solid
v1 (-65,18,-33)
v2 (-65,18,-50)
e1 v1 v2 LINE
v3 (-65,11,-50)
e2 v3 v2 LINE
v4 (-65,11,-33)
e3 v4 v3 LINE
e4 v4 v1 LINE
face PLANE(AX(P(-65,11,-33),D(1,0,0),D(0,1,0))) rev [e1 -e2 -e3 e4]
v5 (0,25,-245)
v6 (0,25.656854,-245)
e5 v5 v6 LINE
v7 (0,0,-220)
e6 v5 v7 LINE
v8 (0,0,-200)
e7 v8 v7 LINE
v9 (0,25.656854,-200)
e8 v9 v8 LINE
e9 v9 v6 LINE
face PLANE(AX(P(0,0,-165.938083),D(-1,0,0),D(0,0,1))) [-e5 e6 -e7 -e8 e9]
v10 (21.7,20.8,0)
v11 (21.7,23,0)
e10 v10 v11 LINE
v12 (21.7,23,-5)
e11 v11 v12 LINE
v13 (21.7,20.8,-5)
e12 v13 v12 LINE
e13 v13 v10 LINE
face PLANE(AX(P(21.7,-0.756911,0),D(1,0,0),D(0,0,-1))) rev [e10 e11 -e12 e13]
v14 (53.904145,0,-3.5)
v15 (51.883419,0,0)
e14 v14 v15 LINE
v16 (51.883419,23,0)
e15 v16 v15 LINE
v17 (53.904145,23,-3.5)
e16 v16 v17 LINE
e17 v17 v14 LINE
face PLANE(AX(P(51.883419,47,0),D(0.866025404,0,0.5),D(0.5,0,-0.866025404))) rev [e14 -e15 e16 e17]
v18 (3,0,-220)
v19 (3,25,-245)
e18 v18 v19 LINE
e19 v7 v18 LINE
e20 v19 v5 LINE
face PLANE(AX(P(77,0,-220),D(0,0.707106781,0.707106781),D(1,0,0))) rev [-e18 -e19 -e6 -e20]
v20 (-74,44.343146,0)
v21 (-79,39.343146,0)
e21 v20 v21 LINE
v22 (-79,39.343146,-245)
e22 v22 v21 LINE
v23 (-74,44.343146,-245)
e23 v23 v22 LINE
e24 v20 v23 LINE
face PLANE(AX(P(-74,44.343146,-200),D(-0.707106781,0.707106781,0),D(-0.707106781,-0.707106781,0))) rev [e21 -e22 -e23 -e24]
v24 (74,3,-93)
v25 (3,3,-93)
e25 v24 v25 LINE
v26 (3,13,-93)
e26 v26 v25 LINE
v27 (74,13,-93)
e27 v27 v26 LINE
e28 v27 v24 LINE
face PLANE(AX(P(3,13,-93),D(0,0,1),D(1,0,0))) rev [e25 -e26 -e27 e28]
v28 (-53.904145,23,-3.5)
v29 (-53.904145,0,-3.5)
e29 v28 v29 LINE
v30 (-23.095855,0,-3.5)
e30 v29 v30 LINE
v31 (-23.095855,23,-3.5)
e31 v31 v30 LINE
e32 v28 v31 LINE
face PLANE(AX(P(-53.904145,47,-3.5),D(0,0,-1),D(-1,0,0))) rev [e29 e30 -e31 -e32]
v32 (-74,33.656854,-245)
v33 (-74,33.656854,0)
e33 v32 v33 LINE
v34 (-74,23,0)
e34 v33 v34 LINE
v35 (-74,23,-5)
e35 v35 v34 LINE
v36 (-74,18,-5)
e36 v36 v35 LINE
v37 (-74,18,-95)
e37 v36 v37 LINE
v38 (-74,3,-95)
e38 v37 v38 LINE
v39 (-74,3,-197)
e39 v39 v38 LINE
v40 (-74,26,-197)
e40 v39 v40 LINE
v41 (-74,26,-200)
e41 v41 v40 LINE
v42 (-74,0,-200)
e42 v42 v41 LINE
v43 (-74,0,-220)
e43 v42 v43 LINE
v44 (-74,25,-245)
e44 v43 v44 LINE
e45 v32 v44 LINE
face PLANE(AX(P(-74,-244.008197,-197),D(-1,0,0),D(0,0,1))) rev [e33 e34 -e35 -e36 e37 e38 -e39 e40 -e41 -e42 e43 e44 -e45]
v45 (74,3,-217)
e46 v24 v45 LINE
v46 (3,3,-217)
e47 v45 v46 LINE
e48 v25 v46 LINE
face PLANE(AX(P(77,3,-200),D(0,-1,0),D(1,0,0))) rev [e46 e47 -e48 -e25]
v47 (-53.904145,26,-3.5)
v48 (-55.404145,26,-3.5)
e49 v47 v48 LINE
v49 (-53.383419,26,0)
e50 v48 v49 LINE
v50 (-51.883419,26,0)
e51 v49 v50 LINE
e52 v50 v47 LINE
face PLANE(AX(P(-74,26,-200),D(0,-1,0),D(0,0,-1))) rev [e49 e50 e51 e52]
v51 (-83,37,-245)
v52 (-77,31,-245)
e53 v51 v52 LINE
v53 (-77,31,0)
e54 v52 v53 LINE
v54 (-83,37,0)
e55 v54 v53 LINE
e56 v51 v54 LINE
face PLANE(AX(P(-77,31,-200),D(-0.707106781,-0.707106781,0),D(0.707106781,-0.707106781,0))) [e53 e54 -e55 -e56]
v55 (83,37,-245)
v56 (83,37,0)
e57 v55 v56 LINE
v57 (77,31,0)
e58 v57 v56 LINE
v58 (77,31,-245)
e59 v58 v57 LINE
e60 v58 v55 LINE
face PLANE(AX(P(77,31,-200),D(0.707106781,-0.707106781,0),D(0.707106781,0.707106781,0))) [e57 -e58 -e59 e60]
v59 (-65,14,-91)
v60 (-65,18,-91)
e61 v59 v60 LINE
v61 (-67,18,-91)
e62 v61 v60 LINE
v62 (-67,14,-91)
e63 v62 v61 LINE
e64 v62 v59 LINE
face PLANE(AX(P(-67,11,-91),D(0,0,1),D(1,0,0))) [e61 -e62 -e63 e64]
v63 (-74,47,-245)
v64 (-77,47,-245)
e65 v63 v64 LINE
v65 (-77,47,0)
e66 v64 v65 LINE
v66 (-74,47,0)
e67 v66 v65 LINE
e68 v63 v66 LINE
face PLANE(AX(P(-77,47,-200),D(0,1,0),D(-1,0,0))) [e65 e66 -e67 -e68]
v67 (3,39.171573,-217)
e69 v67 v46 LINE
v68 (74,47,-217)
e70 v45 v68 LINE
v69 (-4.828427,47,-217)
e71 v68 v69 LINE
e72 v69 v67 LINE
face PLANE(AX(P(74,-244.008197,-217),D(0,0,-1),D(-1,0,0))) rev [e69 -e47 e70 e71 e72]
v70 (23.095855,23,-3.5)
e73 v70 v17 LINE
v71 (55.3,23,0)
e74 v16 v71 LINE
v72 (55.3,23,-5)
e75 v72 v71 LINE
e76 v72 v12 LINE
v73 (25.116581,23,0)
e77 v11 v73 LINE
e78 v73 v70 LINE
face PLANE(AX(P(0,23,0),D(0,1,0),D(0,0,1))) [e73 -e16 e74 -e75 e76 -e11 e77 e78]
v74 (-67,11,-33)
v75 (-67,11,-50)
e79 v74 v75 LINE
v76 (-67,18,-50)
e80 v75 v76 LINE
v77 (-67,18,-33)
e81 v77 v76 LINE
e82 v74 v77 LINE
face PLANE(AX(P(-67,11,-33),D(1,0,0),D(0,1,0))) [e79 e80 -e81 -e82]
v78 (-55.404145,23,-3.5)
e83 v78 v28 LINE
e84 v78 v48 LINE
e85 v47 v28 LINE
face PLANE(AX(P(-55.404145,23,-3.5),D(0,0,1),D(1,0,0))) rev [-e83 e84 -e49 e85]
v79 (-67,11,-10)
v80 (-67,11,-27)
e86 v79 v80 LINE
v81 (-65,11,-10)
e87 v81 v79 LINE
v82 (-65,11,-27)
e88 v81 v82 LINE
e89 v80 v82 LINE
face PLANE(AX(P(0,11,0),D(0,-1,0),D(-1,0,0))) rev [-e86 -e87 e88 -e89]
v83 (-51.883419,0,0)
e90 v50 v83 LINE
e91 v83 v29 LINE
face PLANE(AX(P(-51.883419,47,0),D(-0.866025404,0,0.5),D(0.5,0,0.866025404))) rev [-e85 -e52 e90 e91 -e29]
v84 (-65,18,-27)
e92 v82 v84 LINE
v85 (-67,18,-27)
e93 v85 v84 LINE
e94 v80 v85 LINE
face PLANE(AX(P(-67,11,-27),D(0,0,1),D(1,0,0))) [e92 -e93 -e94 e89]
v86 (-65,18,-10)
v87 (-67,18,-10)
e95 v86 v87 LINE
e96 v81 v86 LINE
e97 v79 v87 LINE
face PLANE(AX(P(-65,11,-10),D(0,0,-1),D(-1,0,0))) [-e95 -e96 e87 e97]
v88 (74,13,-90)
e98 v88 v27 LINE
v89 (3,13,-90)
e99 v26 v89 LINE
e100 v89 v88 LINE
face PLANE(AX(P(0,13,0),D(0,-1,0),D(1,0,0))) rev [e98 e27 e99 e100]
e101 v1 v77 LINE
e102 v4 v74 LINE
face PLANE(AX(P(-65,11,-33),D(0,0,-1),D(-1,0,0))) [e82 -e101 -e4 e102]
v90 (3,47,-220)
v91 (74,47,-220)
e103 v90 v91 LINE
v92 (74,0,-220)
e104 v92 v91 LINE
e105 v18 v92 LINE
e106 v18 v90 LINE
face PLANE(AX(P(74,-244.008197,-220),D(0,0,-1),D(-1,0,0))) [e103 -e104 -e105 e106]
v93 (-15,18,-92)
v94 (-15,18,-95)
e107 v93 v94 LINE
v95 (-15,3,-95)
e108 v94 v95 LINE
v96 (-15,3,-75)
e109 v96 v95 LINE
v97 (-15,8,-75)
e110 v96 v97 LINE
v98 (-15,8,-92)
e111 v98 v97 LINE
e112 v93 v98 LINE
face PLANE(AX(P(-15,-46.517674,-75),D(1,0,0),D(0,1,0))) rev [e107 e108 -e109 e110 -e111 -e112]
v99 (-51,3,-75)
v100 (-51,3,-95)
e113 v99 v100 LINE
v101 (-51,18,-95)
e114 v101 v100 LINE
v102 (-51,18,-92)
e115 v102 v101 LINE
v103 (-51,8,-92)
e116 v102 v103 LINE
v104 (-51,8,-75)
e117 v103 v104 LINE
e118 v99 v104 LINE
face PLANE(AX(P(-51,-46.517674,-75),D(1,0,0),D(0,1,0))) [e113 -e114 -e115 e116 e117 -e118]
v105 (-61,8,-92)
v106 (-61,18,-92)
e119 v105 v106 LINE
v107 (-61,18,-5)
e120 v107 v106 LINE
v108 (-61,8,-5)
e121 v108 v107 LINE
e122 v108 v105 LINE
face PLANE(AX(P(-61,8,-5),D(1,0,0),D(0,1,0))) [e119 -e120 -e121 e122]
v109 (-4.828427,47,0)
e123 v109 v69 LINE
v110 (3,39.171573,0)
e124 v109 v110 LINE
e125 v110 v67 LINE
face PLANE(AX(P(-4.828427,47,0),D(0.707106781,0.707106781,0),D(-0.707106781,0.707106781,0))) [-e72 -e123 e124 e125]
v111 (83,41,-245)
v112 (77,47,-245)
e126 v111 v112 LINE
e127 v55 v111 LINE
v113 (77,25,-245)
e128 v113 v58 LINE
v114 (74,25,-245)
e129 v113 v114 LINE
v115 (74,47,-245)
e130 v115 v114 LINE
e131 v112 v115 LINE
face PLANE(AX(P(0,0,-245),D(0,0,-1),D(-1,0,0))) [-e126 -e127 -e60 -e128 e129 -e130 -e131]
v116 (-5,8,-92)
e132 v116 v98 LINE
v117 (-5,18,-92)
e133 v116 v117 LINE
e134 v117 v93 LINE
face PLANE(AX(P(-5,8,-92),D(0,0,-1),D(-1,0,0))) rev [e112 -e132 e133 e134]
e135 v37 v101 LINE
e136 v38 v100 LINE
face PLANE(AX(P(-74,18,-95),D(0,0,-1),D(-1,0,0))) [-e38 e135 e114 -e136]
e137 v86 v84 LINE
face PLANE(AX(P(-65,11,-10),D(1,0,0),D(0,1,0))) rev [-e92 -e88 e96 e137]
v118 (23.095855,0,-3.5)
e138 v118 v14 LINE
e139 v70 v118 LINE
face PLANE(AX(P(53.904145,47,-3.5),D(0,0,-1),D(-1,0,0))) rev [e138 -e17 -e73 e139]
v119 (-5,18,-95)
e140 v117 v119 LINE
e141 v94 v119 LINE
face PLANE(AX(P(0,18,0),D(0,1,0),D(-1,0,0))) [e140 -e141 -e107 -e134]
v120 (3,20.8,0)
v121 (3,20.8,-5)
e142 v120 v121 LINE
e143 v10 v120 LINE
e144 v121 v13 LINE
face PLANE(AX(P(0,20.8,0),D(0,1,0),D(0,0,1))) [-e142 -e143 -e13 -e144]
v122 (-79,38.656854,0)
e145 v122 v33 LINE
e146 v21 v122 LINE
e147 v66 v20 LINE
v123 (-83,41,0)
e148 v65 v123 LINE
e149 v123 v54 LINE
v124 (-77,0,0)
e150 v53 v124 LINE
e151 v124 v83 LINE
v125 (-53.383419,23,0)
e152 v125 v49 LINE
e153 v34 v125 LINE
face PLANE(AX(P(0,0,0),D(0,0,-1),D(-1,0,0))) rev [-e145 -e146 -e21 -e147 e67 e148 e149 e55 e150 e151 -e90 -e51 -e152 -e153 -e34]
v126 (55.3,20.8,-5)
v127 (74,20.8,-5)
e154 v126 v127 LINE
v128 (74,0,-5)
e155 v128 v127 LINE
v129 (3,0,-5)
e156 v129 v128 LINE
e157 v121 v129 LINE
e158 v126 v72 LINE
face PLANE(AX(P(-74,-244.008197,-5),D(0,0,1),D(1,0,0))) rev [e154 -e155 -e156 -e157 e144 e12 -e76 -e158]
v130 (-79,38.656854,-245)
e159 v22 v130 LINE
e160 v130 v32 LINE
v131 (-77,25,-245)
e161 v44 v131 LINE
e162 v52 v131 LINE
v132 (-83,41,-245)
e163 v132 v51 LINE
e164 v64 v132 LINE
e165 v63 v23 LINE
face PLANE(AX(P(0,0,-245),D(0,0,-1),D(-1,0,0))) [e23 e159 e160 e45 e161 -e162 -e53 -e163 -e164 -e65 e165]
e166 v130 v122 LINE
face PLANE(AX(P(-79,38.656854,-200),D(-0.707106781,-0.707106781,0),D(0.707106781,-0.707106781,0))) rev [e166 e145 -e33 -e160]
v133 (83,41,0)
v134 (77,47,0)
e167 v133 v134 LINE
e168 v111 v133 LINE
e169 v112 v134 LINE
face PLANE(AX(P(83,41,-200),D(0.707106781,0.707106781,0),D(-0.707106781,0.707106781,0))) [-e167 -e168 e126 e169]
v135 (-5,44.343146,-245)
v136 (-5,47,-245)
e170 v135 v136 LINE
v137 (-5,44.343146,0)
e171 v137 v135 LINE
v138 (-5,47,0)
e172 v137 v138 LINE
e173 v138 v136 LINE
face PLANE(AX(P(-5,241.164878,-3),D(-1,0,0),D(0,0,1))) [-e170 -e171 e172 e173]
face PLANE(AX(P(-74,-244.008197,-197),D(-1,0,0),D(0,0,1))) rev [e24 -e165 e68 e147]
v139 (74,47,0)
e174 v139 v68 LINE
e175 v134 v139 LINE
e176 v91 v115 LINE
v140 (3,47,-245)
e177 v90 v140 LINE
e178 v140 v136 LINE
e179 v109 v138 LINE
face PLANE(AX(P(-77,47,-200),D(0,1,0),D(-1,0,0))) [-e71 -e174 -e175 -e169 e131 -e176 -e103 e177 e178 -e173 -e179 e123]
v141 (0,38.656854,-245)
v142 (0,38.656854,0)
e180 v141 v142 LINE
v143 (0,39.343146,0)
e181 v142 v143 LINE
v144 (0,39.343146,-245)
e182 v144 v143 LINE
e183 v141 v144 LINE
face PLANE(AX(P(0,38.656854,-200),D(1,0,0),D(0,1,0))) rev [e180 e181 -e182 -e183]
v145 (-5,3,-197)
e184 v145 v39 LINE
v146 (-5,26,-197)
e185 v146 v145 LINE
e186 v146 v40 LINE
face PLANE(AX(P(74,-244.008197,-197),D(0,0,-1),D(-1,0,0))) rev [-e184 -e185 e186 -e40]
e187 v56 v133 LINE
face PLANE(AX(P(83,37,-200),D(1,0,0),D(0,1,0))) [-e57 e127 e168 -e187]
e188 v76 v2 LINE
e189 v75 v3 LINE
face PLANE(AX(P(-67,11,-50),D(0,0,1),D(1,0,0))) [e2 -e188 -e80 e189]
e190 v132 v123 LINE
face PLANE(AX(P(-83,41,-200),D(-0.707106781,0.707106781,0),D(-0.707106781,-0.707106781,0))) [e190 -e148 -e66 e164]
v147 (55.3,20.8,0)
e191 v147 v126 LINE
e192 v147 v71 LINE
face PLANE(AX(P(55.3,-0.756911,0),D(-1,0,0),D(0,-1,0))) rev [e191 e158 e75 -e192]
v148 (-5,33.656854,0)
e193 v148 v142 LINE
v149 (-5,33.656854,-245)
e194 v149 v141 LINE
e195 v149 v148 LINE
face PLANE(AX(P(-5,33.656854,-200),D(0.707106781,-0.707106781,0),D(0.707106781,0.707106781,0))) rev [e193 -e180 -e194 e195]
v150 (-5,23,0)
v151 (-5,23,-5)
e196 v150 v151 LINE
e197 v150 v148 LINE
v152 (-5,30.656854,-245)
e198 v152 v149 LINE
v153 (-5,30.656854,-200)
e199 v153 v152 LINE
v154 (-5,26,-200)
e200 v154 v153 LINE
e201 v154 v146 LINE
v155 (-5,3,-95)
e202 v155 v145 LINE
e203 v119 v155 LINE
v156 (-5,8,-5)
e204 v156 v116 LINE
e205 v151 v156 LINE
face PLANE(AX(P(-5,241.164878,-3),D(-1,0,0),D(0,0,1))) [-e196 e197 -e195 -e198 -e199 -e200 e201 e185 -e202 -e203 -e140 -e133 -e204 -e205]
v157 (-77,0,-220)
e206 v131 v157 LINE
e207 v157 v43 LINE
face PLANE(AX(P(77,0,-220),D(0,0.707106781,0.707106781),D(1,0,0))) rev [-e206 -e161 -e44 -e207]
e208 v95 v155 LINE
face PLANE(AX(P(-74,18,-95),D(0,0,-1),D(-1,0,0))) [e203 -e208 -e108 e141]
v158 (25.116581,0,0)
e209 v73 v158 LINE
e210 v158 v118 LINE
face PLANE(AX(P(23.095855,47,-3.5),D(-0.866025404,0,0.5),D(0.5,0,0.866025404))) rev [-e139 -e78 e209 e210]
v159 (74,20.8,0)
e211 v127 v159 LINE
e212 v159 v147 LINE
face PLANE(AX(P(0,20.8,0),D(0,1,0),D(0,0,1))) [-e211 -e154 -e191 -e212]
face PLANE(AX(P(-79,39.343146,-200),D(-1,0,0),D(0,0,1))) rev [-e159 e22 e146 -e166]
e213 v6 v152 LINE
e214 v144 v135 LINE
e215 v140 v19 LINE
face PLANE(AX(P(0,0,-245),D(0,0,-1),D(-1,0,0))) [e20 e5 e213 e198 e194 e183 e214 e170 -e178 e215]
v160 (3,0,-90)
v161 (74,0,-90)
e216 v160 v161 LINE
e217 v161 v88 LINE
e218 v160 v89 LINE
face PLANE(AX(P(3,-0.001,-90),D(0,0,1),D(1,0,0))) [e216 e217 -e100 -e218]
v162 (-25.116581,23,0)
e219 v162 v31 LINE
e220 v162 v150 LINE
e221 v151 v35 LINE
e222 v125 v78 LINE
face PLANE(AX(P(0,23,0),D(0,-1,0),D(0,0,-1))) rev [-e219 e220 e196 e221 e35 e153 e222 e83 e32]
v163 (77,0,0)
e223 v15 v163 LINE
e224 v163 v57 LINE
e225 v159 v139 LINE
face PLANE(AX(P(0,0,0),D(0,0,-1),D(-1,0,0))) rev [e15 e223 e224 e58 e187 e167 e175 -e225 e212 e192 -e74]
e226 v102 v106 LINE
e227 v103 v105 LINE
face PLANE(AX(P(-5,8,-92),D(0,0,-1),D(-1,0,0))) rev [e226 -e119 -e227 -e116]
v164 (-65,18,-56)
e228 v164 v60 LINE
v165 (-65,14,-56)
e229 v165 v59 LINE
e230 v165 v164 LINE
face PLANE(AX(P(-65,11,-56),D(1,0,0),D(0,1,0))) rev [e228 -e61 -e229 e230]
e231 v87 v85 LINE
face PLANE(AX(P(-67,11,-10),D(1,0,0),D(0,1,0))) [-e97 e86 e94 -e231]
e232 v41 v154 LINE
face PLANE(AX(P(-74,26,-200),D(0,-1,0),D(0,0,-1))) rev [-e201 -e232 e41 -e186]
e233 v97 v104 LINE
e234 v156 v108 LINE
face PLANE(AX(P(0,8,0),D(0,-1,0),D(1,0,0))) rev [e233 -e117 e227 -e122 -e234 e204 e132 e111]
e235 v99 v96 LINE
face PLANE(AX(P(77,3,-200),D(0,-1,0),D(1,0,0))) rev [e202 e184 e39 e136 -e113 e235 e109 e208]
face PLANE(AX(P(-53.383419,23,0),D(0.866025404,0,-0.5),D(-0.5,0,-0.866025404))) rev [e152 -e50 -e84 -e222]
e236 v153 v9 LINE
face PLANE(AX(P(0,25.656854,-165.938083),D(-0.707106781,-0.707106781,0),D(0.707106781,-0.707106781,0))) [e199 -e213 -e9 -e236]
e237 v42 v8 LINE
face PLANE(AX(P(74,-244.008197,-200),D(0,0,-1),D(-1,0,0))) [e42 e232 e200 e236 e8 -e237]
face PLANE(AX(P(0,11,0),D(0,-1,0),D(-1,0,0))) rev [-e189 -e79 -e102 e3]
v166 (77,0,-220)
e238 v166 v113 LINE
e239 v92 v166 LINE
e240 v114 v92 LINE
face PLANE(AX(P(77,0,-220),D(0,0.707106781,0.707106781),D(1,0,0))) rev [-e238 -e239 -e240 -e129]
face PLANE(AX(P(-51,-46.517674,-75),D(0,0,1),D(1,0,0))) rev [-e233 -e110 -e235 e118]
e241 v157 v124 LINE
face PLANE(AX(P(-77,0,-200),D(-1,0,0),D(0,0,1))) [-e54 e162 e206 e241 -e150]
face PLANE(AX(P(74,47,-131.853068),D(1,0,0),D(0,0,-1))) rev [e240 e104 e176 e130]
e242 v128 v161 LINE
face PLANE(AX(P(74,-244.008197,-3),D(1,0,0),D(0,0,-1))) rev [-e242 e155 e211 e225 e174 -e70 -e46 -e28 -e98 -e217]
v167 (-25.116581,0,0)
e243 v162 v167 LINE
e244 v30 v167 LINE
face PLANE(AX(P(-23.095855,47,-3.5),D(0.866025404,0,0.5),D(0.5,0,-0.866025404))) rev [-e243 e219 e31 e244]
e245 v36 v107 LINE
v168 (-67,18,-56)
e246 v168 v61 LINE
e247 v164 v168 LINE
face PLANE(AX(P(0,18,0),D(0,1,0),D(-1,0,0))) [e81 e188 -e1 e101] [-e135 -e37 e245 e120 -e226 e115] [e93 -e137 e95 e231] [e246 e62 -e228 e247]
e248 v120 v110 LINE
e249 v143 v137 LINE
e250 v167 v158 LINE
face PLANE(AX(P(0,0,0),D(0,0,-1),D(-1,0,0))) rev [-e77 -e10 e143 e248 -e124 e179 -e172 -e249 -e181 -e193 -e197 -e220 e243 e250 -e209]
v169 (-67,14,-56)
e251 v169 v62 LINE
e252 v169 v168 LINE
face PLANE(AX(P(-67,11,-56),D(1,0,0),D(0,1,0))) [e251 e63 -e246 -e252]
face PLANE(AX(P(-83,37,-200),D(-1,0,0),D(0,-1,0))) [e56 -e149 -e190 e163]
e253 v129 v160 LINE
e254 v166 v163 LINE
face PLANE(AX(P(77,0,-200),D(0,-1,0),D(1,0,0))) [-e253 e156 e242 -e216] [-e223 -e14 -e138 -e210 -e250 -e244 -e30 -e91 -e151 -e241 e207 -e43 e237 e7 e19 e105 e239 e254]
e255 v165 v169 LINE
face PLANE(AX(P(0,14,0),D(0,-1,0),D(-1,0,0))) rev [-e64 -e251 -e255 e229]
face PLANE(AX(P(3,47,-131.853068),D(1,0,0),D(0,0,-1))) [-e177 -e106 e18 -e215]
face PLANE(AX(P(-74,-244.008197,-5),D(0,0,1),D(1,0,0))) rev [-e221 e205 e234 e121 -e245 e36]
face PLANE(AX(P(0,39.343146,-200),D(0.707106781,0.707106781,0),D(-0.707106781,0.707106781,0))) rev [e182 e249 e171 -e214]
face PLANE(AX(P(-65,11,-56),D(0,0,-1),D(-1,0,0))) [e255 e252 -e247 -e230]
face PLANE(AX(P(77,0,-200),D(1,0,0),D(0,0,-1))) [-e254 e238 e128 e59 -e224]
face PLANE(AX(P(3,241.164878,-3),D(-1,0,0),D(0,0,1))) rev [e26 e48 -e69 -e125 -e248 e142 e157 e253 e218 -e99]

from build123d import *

# Parameters (mm, degrees)
EXTRUDE_1_DEPTH       = 200
SKETCH_2_W            = 148
SKETCH_2_H            = 194
CUT_EXTRUDE_1_DEPTH   = 44
SKETCH_3_W            = 8
SKETCH_3_H            = 194
EXTRUDE_1_2_DEPTH     = 44
CUT_EXTRUDE_2_DEPTH   = 222.580685079
CUT_EXTRUDE_3_DEPTH   = 219.876677606
MOVE_FACE_1_BY        = 2
MOVE_FACE_1_2_BY      = 2
CUT_EXTRUDE_4_DEPTH   = 222.580685079
CUT_EXTRUDE_5_DEPTH   = 16.171573
MOVE_FACE_2_BY        = 45
MOVE_START            = -217
MOVE_FACE_4_DEPTH     = 20
SKETCH_10_W           = 71
SKETCH_10_H           = 47
CUT_EXTRUDE_6_DEPTH   = 25
SKETCH_11_W           = 69
SKETCH_11_H           = 26
CUT_EXTRUDE_7_DEPTH   = 45
CUT_EXTRUDE_8_DEPTH   = 45
CHAMFER_1_SIZE        = 25
CUT_EXTRUDE_9_REACH   = 264.393
SKETCH_13_W           = 71
SKETCH_13_H           = 85
SKETCH_14_W           = 71
SKETCH_14_H           = 3
EXTRUDE_2_DEPTH       = 10
CUT_EXTRUDE_10_DEPTH  = 16.171572875
SKETCH_16_W           = 18.7
SKETCH_16_H           = 5
CUT_EXTRUDE_11_DEPTH  = 4.2
SKETCH_17_W           = 69
SKETCH_17_H           = 90
EXTRUDE_3_DEPTH       = 15
SKETCH_18_W           = 56
SKETCH_18_H           = 87
CUT_EXTRUDE_12_DEPTH  = 10
CUT_EXTRUDE_13_REACH  = 262.298
SKETCH_19_W           = 36
SKETCH_19_H           = 34
SKETCH_21_W           = 2
SKETCH_21_H           = 17
SKETCH_21_H_2         = 35
CUT_EXTRUDE_1_2_DEPTH = 7
MOVE_FACE_5_BY        = 3


# Read off the part's stored shape, not the designer's step: 移动面4
with BuildPart() as part:
    # 草图1 → Extrude 1 (new body)
    with BuildSketch(Plane.XY):
        Polygon((77, 0), (-77, 0), (-77, 31), (-83, 37), (-83, 41), (-77, 47), (77, 47), (83, 41), (83, 37), (77, 31), align=None)
    extrude(amount=-EXTRUDE_1_DEPTH)

    # 草图2 → Cut-Extrude 1 (cut)
    with BuildSketch(Plane(origin=(0, 47, 0), x_dir=(1, 0, 0), z_dir=(0, 1, 0))):
        with Locations((0, 100)):
            Rectangle(SKETCH_2_W, SKETCH_2_H)
    extrude(amount=-CUT_EXTRUDE_1_DEPTH, mode=Mode.SUBTRACT)

    # 草图3 → Extrude 1 2 (add)
    with BuildSketch(Plane(origin=(0, 3, 0), x_dir=(1, 0, 0), z_dir=(0, 1, 0))):
        with Locations((-1, 100)):
            Rectangle(SKETCH_3_W, SKETCH_3_H)
    extrude(amount=EXTRUDE_1_2_DEPTH)

    # 草图6 → 切除-拉伸2 (cut, through all)
    with BuildSketch(Plane.XY):
        Polygon((-74, 47), (-74, 44.343145751), (-79, 39.343145751), (-79, 38.656854249), (-74, 33.656854249), (-74, 26), (-5, 26), (-5, 33.656854249), (0, 38.656854249), (0, 39.343145751), (-5, 44.343145751), (-5, 47), align=None)
    extrude(amount=-CUT_EXTRUDE_2_DEPTH, mode=Mode.SUBTRACT)

    # 草图7 → 切除-拉伸3 (cut, through all)
    with BuildSketch(Plane.XY.offset(-197)):
        Polygon((-4.828427125, 47), (3, 39.171572875), (74, 39.171572875), (74, 47), (3, 47), align=None)
    extrude(amount=CUT_EXTRUDE_3_DEPTH, mode=Mode.SUBTRACT)

    # Move Face 1: a face moved outward by 2.0
    extrude(part.faces().sort_by_distance((-39.5, 14.5, -3))[0], amount=MOVE_FACE_1_BY, dir=(0, 0, -1))

    # Move Face 1 2: a face moved outward by 2.0
    extrude(part.faces().sort_by_distance((38.5, 21.085786438, -3))[0], amount=MOVE_FACE_1_2_BY, dir=(0, 0, -1))

    # 草图8 → 切除-拉伸4 (cut, through all)
    with BuildSketch(Plane.XZ):
        Polygon((-51.883419246, 0), (-53.904145188, -3.5), (-23.095854812, -3.5), (-25.116580754, 0), align=None)
        Polygon((25.116580754, 0), (51.883419246, 0), (53.904145188, -3.5), (23.095854812, -3.5), align=None)
    extrude(amount=-CUT_EXTRUDE_4_DEPTH, mode=Mode.SUBTRACT)

    # 草图9 → 切除-拉伸5 (cut)
    with BuildSketch(Plane(origin=(0, 39.171572875, 0), x_dir=(1, 0, 0), z_dir=(0, 1, 0))):
        Polygon((26.616580754, 0), (24.595854812, 3.5), (55.404145188, 3.5), (53.383419246, 0), (74, 0), (74, 5), (3, 5), (3, 0), align=None)
        Polygon((-55.404145188, 3.5), (-24.595854812, 3.5), (-26.616580754, 0), (-5, 0), (-5, 5), (-74, 5), (-74, 0), (-53.383419246, 0), align=None)
    extrude(amount=-CUT_EXTRUDE_5_DEPTH, mode=Mode.SUBTRACT)

    # Move Face 2: a face moved outward by 45.0
    extrude(part.faces().sort_by_distance((10.164079255, 20.448401084, -200))[0], amount=MOVE_FACE_2_BY, dir=(0, 0, -1))

    # Move Face 4 outline → Move Face 4 (cut)
    with BuildSketch(Plane.XY.offset(MOVE_START)):
        Polygon((74, 3), (74, 47), (-4.828427125, 47), (3, 39.171572875), (3, 3), align=None)
    extrude(amount=MOVE_FACE_4_DEPTH, mode=Mode.SUBTRACT)

    # 草图10 → 切除-拉伸6 (cut)
    with BuildSketch(Plane(origin=(0, 0, -245), x_dir=(-1, 0, 0), z_dir=(0, 0, -1))):
        with Locations((-38.5, 23.5)):
            Rectangle(SKETCH_10_W, SKETCH_10_H)
    extrude(amount=-CUT_EXTRUDE_6_DEPTH, mode=Mode.SUBTRACT)

    # 草图11 → 切除-拉伸7 (cut)
    with BuildSketch(Plane(origin=(0, 0, -245), x_dir=(-1, 0, 0), z_dir=(0, 0, -1))):
        with Locations((39.5, 13)):
            Rectangle(SKETCH_11_W, SKETCH_11_H)
    extrude(amount=-CUT_EXTRUDE_7_DEPTH, mode=Mode.SUBTRACT)

    # 草图12 → 切除-拉伸8 (cut)
    with BuildSketch(Plane(origin=(0, 0, -245), x_dir=(-1, 0, 0), z_dir=(0, 0, -1))):
        Polygon((5, 0), (0, 0), (0, 25.656854249), (5, 30.656854249), align=None)
    extrude(amount=-CUT_EXTRUDE_8_DEPTH, mode=Mode.SUBTRACT)

    # 倒角1
    chamfer_1_edges = [part.edges().sort_by_distance(p)[0] for p in [
        (-75.5, 0, -245),
        (1.5, 0, -245),
        (75.5, 0, -245),
    ]]
    chamfer(chamfer_1_edges, length=CHAMFER_1_SIZE)

    # 草图13 → 切除-拉伸9 (cut, up to next)
    with BuildSketch(Plane(origin=(0, 3, 0), x_dir=(1, 0, 0), z_dir=(0, 1, 0)), mode=Mode.PRIVATE) as cut_extrude_9_sk1:
        with Locations((38.5, 47.5)):
            Rectangle(SKETCH_13_W, SKETCH_13_H)
    cut_extrude_9_tool1 = extrude(cut_extrude_9_sk1.sketch, amount=-CUT_EXTRUDE_9_REACH, mode=Mode.PRIVATE) & part.part
    add(cut_extrude_9_tool1.solids().sort_by_distance((38.5, 3, -47.5))[0], mode=Mode.SUBTRACT)

    # 草图14 → 凸台-拉伸2 (add)
    with BuildSketch(Plane(origin=(0, 3, 0), x_dir=(1, 0, 0), z_dir=(0, 1, 0))):
        with Locations((38.5, 91.5)):
            Rectangle(SKETCH_14_W, SKETCH_14_H)
    extrude(amount=EXTRUDE_2_DEPTH)

    # 草图15 → 切除-拉伸10 (cut)
    with BuildSketch(Plane(origin=(0, 39.171572875, 0), x_dir=(1, 0, 0), z_dir=(0, 1, 0))):
        Polygon((51.883419246, 0), (53.904145188, 3.5), (55.404145188, 3.5), (53.383419246, 0), align=None)
    extrude(amount=-CUT_EXTRUDE_10_DEPTH, mode=Mode.SUBTRACT)

    # 草图16 → 切除-拉伸11 (cut)
    with BuildSketch(Plane(origin=(0, 25, 0), x_dir=(1, 0, 0), z_dir=(0, 1, 0))):
        with Locations((12.35, 2.5)):
            Rectangle(SKETCH_16_W, SKETCH_16_H)
        with Locations((64.65, 2.5)):
            Rectangle(SKETCH_16_W, SKETCH_16_H)
    extrude(amount=-CUT_EXTRUDE_11_DEPTH, mode=Mode.SUBTRACT)

    # 草图17 → 凸台-拉伸3 (add)
    with BuildSketch(Plane(origin=(0, 3, 0), x_dir=(1, 0, 0), z_dir=(0, 1, 0))):
        with Locations((-39.5, 50)):
            Rectangle(SKETCH_17_W, SKETCH_17_H)
    extrude(amount=EXTRUDE_3_DEPTH)

    # 草图18 → 切除-拉伸12 (cut)
    with BuildSketch(Plane(origin=(0, 18, 0), x_dir=(1, 0, 0), z_dir=(0, 1, 0))):
        with Locations((-33, 48.5)):
            Rectangle(SKETCH_18_W, SKETCH_18_H)
    extrude(amount=-CUT_EXTRUDE_12_DEPTH, mode=Mode.SUBTRACT)

    # 切除-拉伸13: up to this face of the body (flat: up to its plane)
    cut_extrude_13_end = Plane(part.part.faces().sort_by_distance((-39.5, 3, -146))[0])
    # 草图19 → 切除-拉伸13 (cut, up to the picked face)
    with BuildSketch(Plane(origin=(0, 18, 0), x_dir=(1, 0, 0), z_dir=(0, 1, 0)), mode=Mode.PRIVATE) as cut_extrude_13_sk1:
        with Locations((-33, 92)):
            Rectangle(SKETCH_19_W, SKETCH_19_H)
    cut_extrude_13_tool1 = split(extrude(cut_extrude_13_sk1.sketch, amount=-CUT_EXTRUDE_13_REACH, mode=Mode.PRIVATE), bisect_by=cut_extrude_13_end, keep=Keep.BOTH, mode=Mode.PRIVATE)
    add(cut_extrude_13_tool1.solids().sort_by(Axis((-33, 18, -92), (0, -1, 0)))[0], mode=Mode.SUBTRACT)

    # 草图21 → Cut-Extrude 1 2 (cut)
    with BuildSketch(Plane(origin=(0, 18, 0), x_dir=(1, 0, 0), z_dir=(0, 1, 0))):
        with Locations((-66, 18.5)):
            Rectangle(SKETCH_21_W, SKETCH_21_H)
        with Locations((-66, 41.5)):
            Rectangle(SKETCH_21_W, SKETCH_21_H)
        with Locations((-66, 73.5)):
            Rectangle(SKETCH_21_W, SKETCH_21_H_2)
    extrude(amount=-CUT_EXTRUDE_1_2_DEPTH, mode=Mode.SUBTRACT)

    # Move Face 5: a face moved outward by 3.0
    extrude(part.faces().sort_by_distance((-66, 11, -73.5))[0], amount=MOVE_FACE_5_BY, dir=(0, 1, 0))


solid = part.part
